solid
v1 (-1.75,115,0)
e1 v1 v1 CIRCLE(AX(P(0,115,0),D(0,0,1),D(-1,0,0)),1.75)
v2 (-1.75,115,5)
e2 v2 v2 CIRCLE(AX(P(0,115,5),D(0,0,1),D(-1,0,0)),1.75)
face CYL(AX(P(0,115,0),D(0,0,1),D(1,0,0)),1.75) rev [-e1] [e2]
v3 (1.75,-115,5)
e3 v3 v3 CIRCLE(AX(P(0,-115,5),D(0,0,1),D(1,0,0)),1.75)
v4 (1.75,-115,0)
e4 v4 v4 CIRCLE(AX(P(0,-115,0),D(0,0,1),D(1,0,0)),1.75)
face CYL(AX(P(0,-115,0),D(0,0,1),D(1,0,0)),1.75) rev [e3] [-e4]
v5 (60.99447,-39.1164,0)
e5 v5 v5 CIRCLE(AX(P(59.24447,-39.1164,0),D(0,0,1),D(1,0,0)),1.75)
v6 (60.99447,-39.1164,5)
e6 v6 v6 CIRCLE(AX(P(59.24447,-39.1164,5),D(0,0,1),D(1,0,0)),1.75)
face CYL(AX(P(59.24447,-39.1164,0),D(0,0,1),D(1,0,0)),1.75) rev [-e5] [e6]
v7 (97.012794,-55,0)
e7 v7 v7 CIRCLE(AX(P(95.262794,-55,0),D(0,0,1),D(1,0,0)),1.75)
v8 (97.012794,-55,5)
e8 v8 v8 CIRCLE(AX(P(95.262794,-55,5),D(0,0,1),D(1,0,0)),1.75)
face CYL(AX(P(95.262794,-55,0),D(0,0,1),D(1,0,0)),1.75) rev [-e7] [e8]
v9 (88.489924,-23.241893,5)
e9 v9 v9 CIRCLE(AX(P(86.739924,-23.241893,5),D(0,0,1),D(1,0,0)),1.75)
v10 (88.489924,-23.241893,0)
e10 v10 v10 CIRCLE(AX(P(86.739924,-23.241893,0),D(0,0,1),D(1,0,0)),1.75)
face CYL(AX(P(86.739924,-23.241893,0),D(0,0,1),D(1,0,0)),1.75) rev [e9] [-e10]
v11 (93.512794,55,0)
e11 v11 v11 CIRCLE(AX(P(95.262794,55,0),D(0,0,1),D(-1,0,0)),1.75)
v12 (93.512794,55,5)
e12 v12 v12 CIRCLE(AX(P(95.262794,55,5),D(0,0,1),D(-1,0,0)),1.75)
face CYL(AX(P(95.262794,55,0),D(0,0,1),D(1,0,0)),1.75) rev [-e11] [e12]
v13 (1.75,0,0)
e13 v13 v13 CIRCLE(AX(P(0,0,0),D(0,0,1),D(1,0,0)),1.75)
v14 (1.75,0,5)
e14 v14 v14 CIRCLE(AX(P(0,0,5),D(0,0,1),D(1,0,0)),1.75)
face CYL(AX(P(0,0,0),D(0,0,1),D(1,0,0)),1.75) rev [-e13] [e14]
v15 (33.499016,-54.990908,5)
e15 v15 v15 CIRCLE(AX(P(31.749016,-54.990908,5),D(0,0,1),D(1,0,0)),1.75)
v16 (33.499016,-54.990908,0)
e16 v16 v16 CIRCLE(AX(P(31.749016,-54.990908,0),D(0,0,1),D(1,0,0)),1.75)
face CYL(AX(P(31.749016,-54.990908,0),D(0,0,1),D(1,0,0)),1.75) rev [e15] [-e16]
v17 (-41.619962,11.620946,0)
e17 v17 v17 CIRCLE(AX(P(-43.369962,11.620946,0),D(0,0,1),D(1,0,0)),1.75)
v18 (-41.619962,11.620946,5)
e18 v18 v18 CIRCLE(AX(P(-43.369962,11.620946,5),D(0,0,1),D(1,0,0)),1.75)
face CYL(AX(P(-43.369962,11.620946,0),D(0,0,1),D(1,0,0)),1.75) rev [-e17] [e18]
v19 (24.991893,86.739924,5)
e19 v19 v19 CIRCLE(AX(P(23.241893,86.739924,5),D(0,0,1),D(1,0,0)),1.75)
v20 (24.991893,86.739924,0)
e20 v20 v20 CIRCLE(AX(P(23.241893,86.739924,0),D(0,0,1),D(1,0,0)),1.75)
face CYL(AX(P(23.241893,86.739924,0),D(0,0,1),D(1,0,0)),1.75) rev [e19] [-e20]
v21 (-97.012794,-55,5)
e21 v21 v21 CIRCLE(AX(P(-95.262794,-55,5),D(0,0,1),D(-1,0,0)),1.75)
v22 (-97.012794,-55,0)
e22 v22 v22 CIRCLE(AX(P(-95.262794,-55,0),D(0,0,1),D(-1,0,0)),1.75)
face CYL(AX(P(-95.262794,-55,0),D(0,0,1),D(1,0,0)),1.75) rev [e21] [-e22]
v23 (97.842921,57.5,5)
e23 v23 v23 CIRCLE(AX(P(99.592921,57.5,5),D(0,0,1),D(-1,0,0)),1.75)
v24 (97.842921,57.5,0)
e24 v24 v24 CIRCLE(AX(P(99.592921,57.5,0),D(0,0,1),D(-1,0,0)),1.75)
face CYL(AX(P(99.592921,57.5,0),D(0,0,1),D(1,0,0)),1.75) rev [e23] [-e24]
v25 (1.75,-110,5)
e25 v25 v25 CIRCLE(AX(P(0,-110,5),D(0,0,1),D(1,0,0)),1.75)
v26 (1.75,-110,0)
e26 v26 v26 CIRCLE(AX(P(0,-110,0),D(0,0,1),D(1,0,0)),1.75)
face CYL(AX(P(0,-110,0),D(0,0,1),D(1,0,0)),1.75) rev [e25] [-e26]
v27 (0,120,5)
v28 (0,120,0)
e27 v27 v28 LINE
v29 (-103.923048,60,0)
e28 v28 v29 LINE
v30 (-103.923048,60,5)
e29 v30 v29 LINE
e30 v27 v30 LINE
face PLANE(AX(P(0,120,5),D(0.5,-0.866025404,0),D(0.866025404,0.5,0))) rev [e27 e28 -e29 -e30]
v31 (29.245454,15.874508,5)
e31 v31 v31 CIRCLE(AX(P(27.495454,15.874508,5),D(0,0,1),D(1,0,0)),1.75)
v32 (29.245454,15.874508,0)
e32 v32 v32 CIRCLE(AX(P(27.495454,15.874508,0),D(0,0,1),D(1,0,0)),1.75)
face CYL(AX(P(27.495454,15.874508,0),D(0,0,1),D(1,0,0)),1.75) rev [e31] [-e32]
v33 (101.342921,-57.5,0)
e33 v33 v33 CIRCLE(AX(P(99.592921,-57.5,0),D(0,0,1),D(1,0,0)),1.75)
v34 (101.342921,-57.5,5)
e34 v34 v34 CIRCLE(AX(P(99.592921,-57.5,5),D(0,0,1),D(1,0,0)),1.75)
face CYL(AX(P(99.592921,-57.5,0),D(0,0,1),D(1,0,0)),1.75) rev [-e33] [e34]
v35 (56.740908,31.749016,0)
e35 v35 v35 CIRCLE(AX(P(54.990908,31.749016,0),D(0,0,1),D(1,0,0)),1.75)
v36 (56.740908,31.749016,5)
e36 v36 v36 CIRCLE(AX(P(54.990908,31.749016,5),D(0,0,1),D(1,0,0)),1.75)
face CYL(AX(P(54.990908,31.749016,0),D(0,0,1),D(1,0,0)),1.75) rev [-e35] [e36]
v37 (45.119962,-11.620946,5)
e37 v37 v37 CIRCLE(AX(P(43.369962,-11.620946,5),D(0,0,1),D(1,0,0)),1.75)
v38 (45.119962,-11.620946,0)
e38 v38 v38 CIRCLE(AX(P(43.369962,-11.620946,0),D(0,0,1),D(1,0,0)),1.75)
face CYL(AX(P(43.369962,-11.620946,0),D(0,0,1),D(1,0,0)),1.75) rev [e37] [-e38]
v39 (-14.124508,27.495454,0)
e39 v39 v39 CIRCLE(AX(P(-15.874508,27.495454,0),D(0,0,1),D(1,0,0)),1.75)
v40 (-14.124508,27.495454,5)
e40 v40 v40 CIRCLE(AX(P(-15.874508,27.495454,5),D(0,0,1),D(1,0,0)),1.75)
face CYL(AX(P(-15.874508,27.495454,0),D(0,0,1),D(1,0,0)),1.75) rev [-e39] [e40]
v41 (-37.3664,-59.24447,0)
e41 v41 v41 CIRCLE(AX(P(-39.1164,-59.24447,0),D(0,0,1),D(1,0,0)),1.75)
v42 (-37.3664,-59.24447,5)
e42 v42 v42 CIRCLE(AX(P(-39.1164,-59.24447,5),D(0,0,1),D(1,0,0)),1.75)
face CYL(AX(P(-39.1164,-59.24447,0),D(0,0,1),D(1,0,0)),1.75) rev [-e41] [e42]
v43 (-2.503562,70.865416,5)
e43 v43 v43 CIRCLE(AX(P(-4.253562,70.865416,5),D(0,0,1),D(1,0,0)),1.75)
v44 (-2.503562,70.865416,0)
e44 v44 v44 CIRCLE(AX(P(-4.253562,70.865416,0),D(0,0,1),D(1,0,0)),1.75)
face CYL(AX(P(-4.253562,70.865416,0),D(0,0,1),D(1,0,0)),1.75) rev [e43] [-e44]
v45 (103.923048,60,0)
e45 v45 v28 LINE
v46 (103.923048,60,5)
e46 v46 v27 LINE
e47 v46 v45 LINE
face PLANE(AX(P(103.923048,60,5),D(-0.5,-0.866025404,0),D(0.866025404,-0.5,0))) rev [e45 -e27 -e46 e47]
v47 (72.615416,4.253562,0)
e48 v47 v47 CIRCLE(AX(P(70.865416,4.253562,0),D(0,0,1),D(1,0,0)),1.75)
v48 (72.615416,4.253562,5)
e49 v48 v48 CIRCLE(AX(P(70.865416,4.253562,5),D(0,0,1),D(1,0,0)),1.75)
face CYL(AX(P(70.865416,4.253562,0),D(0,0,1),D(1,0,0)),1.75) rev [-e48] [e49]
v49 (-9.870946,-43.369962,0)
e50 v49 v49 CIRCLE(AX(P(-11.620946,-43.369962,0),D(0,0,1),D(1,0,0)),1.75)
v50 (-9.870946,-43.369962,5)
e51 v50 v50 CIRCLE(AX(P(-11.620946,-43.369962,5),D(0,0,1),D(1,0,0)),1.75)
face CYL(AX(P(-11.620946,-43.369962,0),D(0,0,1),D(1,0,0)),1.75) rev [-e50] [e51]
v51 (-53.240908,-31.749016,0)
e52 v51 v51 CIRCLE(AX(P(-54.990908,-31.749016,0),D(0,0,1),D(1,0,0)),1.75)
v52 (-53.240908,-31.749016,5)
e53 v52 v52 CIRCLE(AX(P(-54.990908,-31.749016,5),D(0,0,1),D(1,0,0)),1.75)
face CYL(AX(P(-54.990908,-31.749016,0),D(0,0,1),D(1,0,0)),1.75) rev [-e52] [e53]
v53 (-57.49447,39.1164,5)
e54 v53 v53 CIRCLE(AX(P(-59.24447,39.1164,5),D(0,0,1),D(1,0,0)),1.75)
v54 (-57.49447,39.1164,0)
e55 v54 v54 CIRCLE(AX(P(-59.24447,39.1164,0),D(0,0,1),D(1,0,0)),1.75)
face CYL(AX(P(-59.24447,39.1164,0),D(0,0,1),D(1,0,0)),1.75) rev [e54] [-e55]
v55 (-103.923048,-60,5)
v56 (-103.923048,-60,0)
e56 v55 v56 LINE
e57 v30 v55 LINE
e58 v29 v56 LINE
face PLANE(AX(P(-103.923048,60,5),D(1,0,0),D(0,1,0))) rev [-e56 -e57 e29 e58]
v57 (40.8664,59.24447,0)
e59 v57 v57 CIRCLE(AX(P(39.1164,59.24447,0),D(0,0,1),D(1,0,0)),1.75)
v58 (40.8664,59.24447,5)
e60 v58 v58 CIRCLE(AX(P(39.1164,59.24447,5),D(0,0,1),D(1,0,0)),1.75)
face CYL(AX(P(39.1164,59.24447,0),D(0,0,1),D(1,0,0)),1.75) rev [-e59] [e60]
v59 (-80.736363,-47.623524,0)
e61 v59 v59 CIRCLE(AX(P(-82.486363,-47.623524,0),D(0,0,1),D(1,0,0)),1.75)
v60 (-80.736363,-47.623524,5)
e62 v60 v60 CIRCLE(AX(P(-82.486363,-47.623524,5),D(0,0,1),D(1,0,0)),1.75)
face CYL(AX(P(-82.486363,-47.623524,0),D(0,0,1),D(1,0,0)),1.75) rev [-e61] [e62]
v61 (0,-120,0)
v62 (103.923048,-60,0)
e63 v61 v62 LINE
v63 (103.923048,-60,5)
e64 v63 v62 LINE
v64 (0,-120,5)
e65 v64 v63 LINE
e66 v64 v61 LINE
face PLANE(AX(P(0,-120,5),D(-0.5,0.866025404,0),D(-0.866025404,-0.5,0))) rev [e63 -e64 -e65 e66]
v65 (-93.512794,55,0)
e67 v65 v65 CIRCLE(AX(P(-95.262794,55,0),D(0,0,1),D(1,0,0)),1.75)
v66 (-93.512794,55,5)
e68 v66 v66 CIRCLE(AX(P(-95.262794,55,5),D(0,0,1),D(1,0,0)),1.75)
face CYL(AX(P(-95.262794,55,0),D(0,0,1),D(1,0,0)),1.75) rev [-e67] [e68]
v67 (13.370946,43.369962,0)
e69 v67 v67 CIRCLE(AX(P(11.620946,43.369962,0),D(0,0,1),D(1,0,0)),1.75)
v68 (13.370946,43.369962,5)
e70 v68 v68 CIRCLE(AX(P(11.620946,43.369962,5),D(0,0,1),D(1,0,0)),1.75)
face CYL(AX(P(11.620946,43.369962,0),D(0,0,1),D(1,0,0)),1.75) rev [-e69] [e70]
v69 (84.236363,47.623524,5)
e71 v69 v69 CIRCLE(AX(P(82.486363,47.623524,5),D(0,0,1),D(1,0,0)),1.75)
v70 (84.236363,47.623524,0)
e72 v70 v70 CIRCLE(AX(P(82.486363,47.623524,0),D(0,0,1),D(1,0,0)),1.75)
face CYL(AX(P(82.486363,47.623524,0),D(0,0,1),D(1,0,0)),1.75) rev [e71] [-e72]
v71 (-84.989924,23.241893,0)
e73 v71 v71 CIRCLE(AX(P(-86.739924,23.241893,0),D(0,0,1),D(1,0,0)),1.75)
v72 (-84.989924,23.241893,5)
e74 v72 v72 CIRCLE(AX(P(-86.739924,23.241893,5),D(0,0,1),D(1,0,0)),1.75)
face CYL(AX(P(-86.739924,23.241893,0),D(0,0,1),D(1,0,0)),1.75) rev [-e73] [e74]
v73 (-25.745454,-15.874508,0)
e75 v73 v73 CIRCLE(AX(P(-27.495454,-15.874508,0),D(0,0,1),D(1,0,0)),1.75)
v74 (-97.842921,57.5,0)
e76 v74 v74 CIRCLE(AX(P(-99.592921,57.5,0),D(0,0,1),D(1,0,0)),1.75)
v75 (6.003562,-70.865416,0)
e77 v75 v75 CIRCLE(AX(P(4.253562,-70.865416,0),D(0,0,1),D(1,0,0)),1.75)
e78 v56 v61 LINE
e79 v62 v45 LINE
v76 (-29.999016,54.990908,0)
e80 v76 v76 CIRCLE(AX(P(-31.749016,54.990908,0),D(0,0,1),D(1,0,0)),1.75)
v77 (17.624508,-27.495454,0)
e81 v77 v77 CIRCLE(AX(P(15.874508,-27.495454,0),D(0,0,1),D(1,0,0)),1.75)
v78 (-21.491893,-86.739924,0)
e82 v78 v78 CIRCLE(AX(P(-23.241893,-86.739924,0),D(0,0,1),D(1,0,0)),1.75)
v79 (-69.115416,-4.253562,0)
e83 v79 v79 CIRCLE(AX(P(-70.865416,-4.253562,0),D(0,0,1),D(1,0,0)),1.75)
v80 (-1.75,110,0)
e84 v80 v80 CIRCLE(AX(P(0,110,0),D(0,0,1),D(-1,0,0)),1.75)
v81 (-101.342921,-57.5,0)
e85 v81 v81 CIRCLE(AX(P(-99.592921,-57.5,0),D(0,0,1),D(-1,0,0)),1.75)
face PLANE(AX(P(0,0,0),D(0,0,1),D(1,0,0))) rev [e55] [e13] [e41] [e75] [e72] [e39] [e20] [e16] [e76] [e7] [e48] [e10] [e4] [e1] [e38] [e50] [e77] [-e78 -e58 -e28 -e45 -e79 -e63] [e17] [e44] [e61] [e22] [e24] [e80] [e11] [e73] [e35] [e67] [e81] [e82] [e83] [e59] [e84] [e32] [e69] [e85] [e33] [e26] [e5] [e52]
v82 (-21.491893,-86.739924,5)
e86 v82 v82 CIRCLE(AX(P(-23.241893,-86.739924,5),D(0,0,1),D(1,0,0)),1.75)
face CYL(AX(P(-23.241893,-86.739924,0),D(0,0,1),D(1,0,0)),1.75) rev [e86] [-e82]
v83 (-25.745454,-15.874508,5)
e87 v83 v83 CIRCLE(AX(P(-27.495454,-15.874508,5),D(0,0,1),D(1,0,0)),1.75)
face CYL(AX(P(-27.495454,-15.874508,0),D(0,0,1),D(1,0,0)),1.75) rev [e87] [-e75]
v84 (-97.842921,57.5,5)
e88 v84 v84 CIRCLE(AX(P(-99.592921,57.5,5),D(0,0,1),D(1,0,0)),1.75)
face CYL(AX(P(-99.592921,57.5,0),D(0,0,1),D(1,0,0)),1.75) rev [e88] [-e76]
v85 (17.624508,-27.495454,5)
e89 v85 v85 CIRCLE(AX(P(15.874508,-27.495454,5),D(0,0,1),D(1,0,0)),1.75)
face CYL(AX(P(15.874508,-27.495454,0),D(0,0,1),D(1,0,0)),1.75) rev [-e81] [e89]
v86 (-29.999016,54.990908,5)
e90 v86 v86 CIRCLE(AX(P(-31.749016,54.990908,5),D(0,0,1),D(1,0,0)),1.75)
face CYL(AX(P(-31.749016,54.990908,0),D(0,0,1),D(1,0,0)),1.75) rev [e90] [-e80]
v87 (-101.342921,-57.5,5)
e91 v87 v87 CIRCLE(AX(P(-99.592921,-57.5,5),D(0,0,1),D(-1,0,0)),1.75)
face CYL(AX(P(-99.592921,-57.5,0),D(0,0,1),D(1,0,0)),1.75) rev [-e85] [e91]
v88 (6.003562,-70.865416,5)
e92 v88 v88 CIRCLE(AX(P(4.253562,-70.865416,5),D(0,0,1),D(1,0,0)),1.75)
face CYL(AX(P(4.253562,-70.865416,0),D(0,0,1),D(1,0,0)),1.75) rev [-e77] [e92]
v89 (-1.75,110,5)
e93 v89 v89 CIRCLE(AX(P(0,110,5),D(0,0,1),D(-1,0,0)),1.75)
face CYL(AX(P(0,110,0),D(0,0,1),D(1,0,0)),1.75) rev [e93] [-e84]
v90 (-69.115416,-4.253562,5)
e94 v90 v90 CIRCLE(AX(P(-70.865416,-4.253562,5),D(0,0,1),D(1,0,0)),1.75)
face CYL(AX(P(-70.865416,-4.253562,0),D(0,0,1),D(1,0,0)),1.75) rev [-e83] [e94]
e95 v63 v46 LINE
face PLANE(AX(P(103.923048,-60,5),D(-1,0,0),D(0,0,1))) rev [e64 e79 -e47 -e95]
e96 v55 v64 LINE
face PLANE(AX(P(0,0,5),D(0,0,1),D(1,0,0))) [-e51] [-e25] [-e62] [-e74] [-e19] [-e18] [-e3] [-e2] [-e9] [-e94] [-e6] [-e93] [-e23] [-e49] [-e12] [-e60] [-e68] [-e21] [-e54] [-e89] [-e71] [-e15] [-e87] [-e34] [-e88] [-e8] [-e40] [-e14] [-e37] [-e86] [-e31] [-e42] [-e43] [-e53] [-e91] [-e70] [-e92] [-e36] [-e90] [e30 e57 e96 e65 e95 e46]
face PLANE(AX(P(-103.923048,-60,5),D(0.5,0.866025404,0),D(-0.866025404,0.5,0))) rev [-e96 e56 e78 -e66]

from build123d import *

# Parameters (mm, degrees)
BOSS_EXTRUDE1_DEPTH     = 5
SKETCH2_R               = 1.75
CUT_EXTRUDE1_DEPTH      = 5
SKETCH3_R               = 1.75
CUT_EXTRUDE2_DEPTH      = 159.823801743
FILL_PATTERN1_OUTLINE_R = 1.75
FILL_PATTERN1_DEPTH     = 5


# Read off the part's stored shape, not the designer's step: Fill Pattern1
with BuildPart() as part:
    # Sketch1 → Boss-Extrude1 (new body)
    with BuildSketch(Plane.XY):
        Polygon((103.923048454, -60), (103.923048454, 60), (0, 120), (-103.923048454, 60), (-103.923048454, -60), (0, -120), align=None)
    extrude(amount=BOSS_EXTRUDE1_DEPTH)

    # Sketch2 → Cut-Extrude1 (cut)
    with BuildSketch(Plane.XY.offset(5)):
        with Locations((-99.592921435, 57.5)):
            Circle(SKETCH2_R)
        with Locations((-95.262794416, 55)):
            Circle(SKETCH2_R)
        with Locations(Location((95.262794416, 55, 0), (0, 0, 180))):
            Circle(SKETCH2_R)
        with Locations(Location((99.592921435, 57.5, 0), (0, 0, 180))):
            Circle(SKETCH2_R)
        with Locations((99.592921435, -57.5)):
            Circle(SKETCH2_R)
        with Locations((95.262794416, -55)):
            Circle(SKETCH2_R)
        with Locations(Location((-95.262794416, -55, 0), (0, 0, 180))):
            Circle(SKETCH2_R)
        with Locations(Location((-99.592921435, -57.5, 0), (0, 0, 180))):
            Circle(SKETCH2_R)
        with Locations((0, -115)):
            Circle(SKETCH2_R)
        with Locations((0, -110)):
            Circle(SKETCH2_R)
        with Locations(Location((0, 115, 0), (0, 0, 180))):
            Circle(SKETCH2_R)
        with Locations(Location((0, 110, 0), (0, 0, 180))):
            Circle(SKETCH2_R)
    extrude(amount=-CUT_EXTRUDE1_DEPTH, mode=Mode.SUBTRACT)

    # Sketch3 → Cut-Extrude2 (cut, through all)
    with BuildSketch(Plane.XY.offset(5)):
        Circle(SKETCH3_R)
    extrude(amount=-CUT_EXTRUDE2_DEPTH, mode=Mode.SUBTRACT)

    # Fill Pattern1 outline → Fill Pattern1 (cut)
    with BuildSketch(Plane.XY):
        with Locations((-27.49545417, -15.874507866)):
            Circle(FILL_PATTERN1_OUTLINE_R)
        with Locations((-54.990908339, -31.749015733)):
            Circle(FILL_PATTERN1_OUTLINE_R)
        with Locations((-82.486362509, -47.623523599)):
            Circle(FILL_PATTERN1_OUTLINE_R)
        with Locations((70.865416206, 4.253561563)):
            Circle(FILL_PATTERN1_OUTLINE_R)
        with Locations((-70.865416206, -4.253561563)):
            Circle(FILL_PATTERN1_OUTLINE_R)
        with Locations((82.486362509, 47.623523599)):
            Circle(FILL_PATTERN1_OUTLINE_R)
        with Locations((54.990908339, 31.749015733)):
            Circle(FILL_PATTERN1_OUTLINE_R)
        with Locations((27.49545417, 15.874507866)):
            Circle(FILL_PATTERN1_OUTLINE_R)
        with Locations((4.253561563, -70.865416206)):
            Circle(FILL_PATTERN1_OUTLINE_R)
        with Locations((31.749015733, -54.990908339)):
            Circle(FILL_PATTERN1_OUTLINE_R)
        with Locations((59.244469903, -39.116400473)):
            Circle(FILL_PATTERN1_OUTLINE_R)
        with Locations((86.739924072, -23.241892607)):
            Circle(FILL_PATTERN1_OUTLINE_R)
        with Locations((-39.116400473, -59.244469903)):
            Circle(FILL_PATTERN1_OUTLINE_R)
        with Locations((-11.620946303, -43.369962036)):
            Circle(FILL_PATTERN1_OUTLINE_R)
        with Locations((15.874507866, -27.49545417)):
            Circle(FILL_PATTERN1_OUTLINE_R)
        with Locations((43.369962036, -11.620946303)):
            Circle(FILL_PATTERN1_OUTLINE_R)
        with Locations((-4.253561563, 70.865416206)):
            Circle(FILL_PATTERN1_OUTLINE_R)
        with Locations((-31.749015733, 54.990908339)):
            Circle(FILL_PATTERN1_OUTLINE_R)
        with Locations((-59.244469903, 39.116400473)):
            Circle(FILL_PATTERN1_OUTLINE_R)
        with Locations((-86.739924072, 23.241892607)):
            Circle(FILL_PATTERN1_OUTLINE_R)
        with Locations((39.116400473, 59.244469903)):
            Circle(FILL_PATTERN1_OUTLINE_R)
        with Locations((11.620946303, 43.369962036)):
            Circle(FILL_PATTERN1_OUTLINE_R)
        with Locations((-15.874507866, 27.49545417)):
            Circle(FILL_PATTERN1_OUTLINE_R)
        with Locations((-43.369962036, 11.620946303)):
            Circle(FILL_PATTERN1_OUTLINE_R)
        with Locations((23.241892607, 86.739924072)):
            Circle(FILL_PATTERN1_OUTLINE_R)
        with Locations((-23.241892607, -86.739924072)):
            Circle(FILL_PATTERN1_OUTLINE_R)
    extrude(amount=FILL_PATTERN1_DEPTH, mode=Mode.SUBTRACT)


solid = part.part
